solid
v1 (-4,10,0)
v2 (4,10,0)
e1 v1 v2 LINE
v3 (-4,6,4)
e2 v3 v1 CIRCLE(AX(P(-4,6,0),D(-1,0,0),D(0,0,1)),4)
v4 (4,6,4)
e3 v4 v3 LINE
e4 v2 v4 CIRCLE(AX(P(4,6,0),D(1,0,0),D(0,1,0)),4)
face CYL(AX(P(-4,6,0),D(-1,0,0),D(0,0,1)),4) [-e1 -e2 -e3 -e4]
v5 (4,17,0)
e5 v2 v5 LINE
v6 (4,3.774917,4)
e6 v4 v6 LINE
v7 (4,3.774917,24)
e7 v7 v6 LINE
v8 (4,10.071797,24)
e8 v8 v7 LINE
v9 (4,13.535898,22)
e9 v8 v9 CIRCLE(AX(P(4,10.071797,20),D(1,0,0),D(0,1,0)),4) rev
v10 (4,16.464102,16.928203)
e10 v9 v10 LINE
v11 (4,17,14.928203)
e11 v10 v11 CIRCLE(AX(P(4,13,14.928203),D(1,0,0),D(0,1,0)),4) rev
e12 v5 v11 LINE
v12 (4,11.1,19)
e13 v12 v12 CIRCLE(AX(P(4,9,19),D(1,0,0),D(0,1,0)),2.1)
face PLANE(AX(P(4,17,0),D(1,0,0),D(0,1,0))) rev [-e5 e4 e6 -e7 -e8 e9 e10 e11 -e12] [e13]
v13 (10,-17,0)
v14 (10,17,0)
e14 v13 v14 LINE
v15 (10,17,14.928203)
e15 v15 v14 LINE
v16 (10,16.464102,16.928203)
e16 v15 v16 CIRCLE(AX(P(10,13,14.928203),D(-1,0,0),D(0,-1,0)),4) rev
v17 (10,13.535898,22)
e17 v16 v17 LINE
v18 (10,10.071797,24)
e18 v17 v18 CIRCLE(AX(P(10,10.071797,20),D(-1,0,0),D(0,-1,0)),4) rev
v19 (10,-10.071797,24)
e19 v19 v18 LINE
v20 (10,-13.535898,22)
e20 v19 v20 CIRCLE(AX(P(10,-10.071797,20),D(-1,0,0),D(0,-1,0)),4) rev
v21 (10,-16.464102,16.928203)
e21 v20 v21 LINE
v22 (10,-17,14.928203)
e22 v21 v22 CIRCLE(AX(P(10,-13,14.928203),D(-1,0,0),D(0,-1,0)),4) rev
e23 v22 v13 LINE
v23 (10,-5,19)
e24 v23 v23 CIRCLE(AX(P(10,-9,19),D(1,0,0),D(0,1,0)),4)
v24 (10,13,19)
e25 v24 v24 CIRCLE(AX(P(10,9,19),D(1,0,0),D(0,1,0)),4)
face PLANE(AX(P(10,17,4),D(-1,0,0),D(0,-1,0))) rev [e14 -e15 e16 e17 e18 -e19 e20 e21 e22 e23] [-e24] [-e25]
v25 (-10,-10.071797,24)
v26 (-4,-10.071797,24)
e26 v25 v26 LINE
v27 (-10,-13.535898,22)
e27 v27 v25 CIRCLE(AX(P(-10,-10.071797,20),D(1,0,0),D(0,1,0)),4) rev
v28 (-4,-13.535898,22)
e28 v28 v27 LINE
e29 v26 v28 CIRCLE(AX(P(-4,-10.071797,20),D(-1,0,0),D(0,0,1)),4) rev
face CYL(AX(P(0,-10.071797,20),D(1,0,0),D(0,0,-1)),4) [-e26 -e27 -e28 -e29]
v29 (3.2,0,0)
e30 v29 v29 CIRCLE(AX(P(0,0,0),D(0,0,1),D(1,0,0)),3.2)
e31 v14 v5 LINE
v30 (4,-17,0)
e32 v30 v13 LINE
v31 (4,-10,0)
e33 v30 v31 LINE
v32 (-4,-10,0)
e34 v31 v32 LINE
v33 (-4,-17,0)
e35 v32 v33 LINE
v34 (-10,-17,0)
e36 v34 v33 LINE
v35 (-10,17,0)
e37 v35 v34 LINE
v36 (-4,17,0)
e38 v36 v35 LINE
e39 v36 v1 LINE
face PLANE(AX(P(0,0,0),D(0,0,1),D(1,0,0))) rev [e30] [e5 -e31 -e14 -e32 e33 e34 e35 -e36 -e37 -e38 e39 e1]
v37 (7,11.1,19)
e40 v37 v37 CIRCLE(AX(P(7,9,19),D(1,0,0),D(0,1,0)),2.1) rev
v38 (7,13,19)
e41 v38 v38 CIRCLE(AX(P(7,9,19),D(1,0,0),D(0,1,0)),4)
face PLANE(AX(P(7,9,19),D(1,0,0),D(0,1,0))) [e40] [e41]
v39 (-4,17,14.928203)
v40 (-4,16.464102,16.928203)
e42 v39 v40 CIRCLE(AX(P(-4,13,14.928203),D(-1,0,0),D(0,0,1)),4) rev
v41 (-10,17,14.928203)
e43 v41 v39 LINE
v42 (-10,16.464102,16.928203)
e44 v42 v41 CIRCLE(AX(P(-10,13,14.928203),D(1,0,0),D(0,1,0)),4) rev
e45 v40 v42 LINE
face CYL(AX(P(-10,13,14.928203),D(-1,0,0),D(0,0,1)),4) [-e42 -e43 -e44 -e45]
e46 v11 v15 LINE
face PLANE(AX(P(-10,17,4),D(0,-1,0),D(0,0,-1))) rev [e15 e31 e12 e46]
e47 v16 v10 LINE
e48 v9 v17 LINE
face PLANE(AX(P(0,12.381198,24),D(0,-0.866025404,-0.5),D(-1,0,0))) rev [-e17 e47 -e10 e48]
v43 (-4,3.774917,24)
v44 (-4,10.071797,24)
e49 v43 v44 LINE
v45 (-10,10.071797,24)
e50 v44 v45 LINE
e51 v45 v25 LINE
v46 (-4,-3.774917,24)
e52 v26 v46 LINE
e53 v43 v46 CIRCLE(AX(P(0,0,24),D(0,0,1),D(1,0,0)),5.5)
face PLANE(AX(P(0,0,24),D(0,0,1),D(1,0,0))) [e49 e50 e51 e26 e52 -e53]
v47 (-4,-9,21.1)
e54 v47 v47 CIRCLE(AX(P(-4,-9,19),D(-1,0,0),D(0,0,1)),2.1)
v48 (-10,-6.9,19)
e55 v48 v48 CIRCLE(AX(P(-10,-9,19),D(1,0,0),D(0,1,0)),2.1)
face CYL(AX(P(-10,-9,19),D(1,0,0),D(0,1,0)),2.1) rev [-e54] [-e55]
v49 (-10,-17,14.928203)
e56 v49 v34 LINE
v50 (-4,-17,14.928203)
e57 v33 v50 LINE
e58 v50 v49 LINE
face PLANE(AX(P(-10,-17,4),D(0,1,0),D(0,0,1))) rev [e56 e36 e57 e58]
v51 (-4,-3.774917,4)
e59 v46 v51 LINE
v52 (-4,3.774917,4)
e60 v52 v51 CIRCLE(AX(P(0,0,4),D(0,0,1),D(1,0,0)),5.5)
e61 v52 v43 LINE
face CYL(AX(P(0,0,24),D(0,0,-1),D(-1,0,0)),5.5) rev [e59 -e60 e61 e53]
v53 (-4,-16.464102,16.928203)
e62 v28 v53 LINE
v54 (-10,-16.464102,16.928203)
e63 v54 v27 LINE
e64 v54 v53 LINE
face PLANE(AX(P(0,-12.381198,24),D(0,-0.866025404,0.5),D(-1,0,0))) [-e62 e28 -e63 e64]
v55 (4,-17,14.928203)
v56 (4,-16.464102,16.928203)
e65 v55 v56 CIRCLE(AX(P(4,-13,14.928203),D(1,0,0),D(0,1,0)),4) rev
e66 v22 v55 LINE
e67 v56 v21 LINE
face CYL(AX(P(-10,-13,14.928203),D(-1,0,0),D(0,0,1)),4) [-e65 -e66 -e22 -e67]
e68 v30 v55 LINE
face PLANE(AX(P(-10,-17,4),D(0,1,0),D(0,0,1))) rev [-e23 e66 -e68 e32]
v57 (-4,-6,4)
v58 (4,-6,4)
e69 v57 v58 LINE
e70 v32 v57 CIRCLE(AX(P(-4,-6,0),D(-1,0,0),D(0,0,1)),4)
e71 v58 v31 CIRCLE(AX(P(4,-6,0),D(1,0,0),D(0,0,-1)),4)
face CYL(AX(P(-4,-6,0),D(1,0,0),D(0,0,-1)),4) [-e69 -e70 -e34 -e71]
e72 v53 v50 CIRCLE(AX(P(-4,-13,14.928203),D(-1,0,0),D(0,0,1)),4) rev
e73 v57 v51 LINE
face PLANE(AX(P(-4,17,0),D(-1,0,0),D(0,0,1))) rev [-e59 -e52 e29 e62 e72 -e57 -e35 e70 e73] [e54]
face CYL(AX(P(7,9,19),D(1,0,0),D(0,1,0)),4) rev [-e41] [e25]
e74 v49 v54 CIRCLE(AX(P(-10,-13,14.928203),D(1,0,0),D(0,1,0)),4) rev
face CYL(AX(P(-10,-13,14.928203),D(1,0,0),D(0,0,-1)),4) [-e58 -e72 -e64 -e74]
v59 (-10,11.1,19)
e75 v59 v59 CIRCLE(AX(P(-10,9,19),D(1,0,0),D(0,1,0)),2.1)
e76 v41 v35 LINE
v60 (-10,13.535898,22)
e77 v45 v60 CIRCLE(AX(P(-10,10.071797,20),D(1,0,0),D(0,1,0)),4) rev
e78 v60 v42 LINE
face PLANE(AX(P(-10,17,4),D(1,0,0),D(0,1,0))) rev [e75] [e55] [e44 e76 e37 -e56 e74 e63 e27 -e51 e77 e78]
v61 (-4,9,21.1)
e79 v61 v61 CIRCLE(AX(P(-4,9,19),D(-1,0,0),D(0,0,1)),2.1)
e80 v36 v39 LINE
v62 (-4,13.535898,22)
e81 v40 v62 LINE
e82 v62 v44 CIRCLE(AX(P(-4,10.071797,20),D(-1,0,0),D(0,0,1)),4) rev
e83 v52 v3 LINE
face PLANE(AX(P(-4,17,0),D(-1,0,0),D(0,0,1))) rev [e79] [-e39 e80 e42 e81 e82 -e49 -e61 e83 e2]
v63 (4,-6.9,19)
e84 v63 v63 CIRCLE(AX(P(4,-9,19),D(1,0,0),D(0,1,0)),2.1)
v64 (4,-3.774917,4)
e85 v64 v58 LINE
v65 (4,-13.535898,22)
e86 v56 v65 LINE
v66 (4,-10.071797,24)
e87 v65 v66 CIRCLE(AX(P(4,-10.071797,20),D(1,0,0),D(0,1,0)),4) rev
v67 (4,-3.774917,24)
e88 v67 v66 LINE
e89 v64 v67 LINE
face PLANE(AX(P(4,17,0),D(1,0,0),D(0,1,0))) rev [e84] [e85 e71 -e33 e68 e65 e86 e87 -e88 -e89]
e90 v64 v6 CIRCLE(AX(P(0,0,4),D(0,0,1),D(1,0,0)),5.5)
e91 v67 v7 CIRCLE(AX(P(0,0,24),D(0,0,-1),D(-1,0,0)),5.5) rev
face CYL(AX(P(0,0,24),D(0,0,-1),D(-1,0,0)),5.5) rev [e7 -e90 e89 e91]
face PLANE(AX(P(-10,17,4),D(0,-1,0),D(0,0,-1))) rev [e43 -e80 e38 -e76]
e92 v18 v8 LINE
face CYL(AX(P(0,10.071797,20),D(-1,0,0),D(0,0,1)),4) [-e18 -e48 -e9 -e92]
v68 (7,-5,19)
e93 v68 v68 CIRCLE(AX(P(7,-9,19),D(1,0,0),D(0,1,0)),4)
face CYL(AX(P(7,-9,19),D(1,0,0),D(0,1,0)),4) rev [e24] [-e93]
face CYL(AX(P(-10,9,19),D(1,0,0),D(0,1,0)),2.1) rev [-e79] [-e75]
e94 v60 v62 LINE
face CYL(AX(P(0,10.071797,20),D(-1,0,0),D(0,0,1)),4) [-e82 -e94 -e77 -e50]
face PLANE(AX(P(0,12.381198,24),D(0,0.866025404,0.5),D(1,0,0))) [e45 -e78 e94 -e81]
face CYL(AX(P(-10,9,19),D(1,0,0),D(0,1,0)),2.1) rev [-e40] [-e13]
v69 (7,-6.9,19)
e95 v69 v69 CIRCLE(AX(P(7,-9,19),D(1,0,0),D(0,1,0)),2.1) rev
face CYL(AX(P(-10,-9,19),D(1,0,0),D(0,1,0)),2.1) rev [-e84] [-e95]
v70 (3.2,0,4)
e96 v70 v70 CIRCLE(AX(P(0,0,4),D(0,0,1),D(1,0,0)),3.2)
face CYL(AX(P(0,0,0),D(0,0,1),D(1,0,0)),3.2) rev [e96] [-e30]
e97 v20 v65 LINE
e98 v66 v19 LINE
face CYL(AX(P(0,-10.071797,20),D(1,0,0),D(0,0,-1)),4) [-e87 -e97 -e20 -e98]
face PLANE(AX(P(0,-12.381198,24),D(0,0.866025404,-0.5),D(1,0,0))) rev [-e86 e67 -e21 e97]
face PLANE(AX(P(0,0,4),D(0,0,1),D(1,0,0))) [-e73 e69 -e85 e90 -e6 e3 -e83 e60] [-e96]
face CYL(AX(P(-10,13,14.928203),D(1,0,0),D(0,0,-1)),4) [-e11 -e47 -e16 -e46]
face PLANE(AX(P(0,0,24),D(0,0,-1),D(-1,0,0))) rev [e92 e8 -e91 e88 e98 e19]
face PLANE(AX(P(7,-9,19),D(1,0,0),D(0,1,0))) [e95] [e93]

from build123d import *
from OCP.BRepFilletAPI import BRepFilletAPI_MakeChamfer

# Parameters (mm, degrees)
ESQUISSE1_W             = 20
ESQUISSE1_H             = 34
BOSS_EXTRU_1_DEPTH      = 4
ESQUISSE2_W             = 8
ESQUISSE2_H             = 7
ENL_V_MAT_EXTRU_1_DEPTH = 21.124611797
CONG_1_R                = 4
ESQUISSE3_W             = 6
ESQUISSE3_H             = 34
BOSS_EXTRU_2_DEPTH      = 20
ESQUISSE4_R             = 2.1
ENL_V_MAT_EXTRU_2_DEPTH = 36.566838488
CHANFREIN1_SIZE         = 8
CHANFREIN1_SIZE2        = 4.618802154
CONG_2_R                = 4
ESQUISSE5_R             = 3.2
ENL_V_MAT_EXTRU_3_DEPTH = 29.08914381
ESQUISSE6_R             = 5.5
ENL_V_MAT_EXTRU_4_DEPTH = 29.08914381
ESQUISSE7_R             = 4
ENL_V_MAT_EXTRU_5_DEPTH = 3


with BuildPart() as part:
    # Esquisse1 → Boss.-Extru.1 (new body)
    with BuildSketch(Plane.XY):
        Rectangle(ESQUISSE1_W, ESQUISSE1_H)
    extrude(amount=BOSS_EXTRU_1_DEPTH)

    # Esquisse2 → Enlèv. mat.-Extru.1 (cut, through all)
    with BuildSketch(Plane.XY.offset(4)):
        with Locations((0, 13.5)):
            Rectangle(ESQUISSE2_W, ESQUISSE2_H)
        with Locations((0, -13.5)):
            Rectangle(ESQUISSE2_W, ESQUISSE2_H)
    extrude(amount=-ENL_V_MAT_EXTRU_1_DEPTH, mode=Mode.SUBTRACT)

    # Congé1
    cong_1_edges = [part.edges().sort_by_distance(p)[0] for p in [
        (0, -10, 4),
        (0, 10, 4),
    ]]
    fillet(cong_1_edges, radius=CONG_1_R - 0.0001)  # a hair under: the kernel refuses the full size

    # Esquisse3 → Boss.-Extru.2 (add)
    with BuildSketch(Plane.XY.offset(4)):
        with Locations((-7, 0)):
            Rectangle(ESQUISSE3_W, ESQUISSE3_H)
        with Locations((7, 0)):
            Rectangle(ESQUISSE3_W, ESQUISSE3_H)
    extrude(amount=BOSS_EXTRU_2_DEPTH)

    # Esquisse4 → Enlèv. mat.-Extru.2 (cut, through all)
    with BuildSketch(Plane(origin=(10, 0, 0), x_dir=(0, 0, -1), z_dir=(1, 0, 0))):
        with Locations(Location((-19, 9, 0), (0, 0, 90))):
            Circle(ESQUISSE4_R)
        with Locations(Location((-19, -9, 0), (0, 0, 90))):
            Circle(ESQUISSE4_R)
    extrude(amount=-ENL_V_MAT_EXTRU_2_DEPTH, mode=Mode.SUBTRACT)

    # Chanfrein1: one chamfer whose edges measure the first distance from different faces: ONE call of the kernel's chamfer builder (chamfer() names one face for all edges)
    chanfrein1_edges_1 = [part.edges().sort_by_distance(p)[0] for p in [
        (-7, -17, 24),
    ]]
    chanfrein1_side_1 = [part.faces().sort_by_distance(p)[0] for p in [
        (-7, -17, 12),
    ]]
    chanfrein1_edges_2 = [part.edges().sort_by_distance(p)[0] for p in [
        (-7, 17, 24),
    ]]
    chanfrein1_side_2 = [part.faces().sort_by_distance(p)[0] for p in [
        (-7, 17, 12),
    ]]
    chanfrein1_edges_3 = [part.edges().sort_by_distance(p)[0] for p in [
        (7, -17, 24),
    ]]
    chanfrein1_side_3 = [part.faces().sort_by_distance(p)[0] for p in [
        (7, -17, 12),
    ]]
    chanfrein1_edges_4 = [part.edges().sort_by_distance(p)[0] for p in [
        (7, 17, 24),
    ]]
    chanfrein1_side_4 = [part.faces().sort_by_distance(p)[0] for p in [
        (7, 17, 12),
    ]]
    chanfrein1 = BRepFilletAPI_MakeChamfer(part.part.solid().wrapped)
    for e in chanfrein1_edges_1:
        chanfrein1.Add(CHANFREIN1_SIZE, CHANFREIN1_SIZE2, e.wrapped, chanfrein1_side_1[0].wrapped)  # the first distance lies on this face
    for e in chanfrein1_edges_2:
        chanfrein1.Add(CHANFREIN1_SIZE, CHANFREIN1_SIZE2, e.wrapped, chanfrein1_side_2[0].wrapped)  # the first distance lies on this face
    for e in chanfrein1_edges_3:
        chanfrein1.Add(CHANFREIN1_SIZE, CHANFREIN1_SIZE2, e.wrapped, chanfrein1_side_3[0].wrapped)  # the first distance lies on this face
    for e in chanfrein1_edges_4:
        chanfrein1.Add(CHANFREIN1_SIZE, CHANFREIN1_SIZE2, e.wrapped, chanfrein1_side_4[0].wrapped)  # the first distance lies on this face
    add(Compound.cast(chanfrein1.Shape()), mode=Mode.REPLACE)

    # Congé2
    cong_2_edges = [part.edges().sort_by_distance(p)[0] for p in [
        (-7, 12.381197846, 24),
        (-7, -12.381197846, 24),
        (-7, -17, 16),
        (7, 12.381197846, 24),
        (7, -12.381197846, 24),
        (7, -17, 16),
        (-7, 17, 16),
        (7, 17, 16),
    ]]
    fillet(cong_2_edges, radius=CONG_2_R)

    # Esquisse5 → Enlèv. mat.-Extru.3 (cut, through all)
    with BuildSketch(Plane.XY.offset(4)):
        Circle(ESQUISSE5_R)
    extrude(amount=-ENL_V_MAT_EXTRU_3_DEPTH, mode=Mode.SUBTRACT)

    # Esquisse6 → Enlèv. mat.-Extru.4 (cut, through all)
    with BuildSketch(Plane.XY.offset(4)):
        Circle(ESQUISSE6_R)
    extrude(amount=ENL_V_MAT_EXTRU_4_DEPTH, mode=Mode.SUBTRACT)

    # Esquisse7 → Enlèv. mat.-Extru.5 (cut)
    with BuildSketch(Plane(origin=(10, 0, 0), x_dir=(0, 0, -1), z_dir=(1, 0, 0))):
        with Locations(Location((-19, 9, 0), (0, 0, 90))):
            Circle(ESQUISSE7_R)
        with Locations(Location((-19, -9, 0), (0, 0, 90))):
            Circle(ESQUISSE7_R)
    extrude(amount=-ENL_V_MAT_EXTRU_5_DEPTH, mode=Mode.SUBTRACT)


solid = part.part
